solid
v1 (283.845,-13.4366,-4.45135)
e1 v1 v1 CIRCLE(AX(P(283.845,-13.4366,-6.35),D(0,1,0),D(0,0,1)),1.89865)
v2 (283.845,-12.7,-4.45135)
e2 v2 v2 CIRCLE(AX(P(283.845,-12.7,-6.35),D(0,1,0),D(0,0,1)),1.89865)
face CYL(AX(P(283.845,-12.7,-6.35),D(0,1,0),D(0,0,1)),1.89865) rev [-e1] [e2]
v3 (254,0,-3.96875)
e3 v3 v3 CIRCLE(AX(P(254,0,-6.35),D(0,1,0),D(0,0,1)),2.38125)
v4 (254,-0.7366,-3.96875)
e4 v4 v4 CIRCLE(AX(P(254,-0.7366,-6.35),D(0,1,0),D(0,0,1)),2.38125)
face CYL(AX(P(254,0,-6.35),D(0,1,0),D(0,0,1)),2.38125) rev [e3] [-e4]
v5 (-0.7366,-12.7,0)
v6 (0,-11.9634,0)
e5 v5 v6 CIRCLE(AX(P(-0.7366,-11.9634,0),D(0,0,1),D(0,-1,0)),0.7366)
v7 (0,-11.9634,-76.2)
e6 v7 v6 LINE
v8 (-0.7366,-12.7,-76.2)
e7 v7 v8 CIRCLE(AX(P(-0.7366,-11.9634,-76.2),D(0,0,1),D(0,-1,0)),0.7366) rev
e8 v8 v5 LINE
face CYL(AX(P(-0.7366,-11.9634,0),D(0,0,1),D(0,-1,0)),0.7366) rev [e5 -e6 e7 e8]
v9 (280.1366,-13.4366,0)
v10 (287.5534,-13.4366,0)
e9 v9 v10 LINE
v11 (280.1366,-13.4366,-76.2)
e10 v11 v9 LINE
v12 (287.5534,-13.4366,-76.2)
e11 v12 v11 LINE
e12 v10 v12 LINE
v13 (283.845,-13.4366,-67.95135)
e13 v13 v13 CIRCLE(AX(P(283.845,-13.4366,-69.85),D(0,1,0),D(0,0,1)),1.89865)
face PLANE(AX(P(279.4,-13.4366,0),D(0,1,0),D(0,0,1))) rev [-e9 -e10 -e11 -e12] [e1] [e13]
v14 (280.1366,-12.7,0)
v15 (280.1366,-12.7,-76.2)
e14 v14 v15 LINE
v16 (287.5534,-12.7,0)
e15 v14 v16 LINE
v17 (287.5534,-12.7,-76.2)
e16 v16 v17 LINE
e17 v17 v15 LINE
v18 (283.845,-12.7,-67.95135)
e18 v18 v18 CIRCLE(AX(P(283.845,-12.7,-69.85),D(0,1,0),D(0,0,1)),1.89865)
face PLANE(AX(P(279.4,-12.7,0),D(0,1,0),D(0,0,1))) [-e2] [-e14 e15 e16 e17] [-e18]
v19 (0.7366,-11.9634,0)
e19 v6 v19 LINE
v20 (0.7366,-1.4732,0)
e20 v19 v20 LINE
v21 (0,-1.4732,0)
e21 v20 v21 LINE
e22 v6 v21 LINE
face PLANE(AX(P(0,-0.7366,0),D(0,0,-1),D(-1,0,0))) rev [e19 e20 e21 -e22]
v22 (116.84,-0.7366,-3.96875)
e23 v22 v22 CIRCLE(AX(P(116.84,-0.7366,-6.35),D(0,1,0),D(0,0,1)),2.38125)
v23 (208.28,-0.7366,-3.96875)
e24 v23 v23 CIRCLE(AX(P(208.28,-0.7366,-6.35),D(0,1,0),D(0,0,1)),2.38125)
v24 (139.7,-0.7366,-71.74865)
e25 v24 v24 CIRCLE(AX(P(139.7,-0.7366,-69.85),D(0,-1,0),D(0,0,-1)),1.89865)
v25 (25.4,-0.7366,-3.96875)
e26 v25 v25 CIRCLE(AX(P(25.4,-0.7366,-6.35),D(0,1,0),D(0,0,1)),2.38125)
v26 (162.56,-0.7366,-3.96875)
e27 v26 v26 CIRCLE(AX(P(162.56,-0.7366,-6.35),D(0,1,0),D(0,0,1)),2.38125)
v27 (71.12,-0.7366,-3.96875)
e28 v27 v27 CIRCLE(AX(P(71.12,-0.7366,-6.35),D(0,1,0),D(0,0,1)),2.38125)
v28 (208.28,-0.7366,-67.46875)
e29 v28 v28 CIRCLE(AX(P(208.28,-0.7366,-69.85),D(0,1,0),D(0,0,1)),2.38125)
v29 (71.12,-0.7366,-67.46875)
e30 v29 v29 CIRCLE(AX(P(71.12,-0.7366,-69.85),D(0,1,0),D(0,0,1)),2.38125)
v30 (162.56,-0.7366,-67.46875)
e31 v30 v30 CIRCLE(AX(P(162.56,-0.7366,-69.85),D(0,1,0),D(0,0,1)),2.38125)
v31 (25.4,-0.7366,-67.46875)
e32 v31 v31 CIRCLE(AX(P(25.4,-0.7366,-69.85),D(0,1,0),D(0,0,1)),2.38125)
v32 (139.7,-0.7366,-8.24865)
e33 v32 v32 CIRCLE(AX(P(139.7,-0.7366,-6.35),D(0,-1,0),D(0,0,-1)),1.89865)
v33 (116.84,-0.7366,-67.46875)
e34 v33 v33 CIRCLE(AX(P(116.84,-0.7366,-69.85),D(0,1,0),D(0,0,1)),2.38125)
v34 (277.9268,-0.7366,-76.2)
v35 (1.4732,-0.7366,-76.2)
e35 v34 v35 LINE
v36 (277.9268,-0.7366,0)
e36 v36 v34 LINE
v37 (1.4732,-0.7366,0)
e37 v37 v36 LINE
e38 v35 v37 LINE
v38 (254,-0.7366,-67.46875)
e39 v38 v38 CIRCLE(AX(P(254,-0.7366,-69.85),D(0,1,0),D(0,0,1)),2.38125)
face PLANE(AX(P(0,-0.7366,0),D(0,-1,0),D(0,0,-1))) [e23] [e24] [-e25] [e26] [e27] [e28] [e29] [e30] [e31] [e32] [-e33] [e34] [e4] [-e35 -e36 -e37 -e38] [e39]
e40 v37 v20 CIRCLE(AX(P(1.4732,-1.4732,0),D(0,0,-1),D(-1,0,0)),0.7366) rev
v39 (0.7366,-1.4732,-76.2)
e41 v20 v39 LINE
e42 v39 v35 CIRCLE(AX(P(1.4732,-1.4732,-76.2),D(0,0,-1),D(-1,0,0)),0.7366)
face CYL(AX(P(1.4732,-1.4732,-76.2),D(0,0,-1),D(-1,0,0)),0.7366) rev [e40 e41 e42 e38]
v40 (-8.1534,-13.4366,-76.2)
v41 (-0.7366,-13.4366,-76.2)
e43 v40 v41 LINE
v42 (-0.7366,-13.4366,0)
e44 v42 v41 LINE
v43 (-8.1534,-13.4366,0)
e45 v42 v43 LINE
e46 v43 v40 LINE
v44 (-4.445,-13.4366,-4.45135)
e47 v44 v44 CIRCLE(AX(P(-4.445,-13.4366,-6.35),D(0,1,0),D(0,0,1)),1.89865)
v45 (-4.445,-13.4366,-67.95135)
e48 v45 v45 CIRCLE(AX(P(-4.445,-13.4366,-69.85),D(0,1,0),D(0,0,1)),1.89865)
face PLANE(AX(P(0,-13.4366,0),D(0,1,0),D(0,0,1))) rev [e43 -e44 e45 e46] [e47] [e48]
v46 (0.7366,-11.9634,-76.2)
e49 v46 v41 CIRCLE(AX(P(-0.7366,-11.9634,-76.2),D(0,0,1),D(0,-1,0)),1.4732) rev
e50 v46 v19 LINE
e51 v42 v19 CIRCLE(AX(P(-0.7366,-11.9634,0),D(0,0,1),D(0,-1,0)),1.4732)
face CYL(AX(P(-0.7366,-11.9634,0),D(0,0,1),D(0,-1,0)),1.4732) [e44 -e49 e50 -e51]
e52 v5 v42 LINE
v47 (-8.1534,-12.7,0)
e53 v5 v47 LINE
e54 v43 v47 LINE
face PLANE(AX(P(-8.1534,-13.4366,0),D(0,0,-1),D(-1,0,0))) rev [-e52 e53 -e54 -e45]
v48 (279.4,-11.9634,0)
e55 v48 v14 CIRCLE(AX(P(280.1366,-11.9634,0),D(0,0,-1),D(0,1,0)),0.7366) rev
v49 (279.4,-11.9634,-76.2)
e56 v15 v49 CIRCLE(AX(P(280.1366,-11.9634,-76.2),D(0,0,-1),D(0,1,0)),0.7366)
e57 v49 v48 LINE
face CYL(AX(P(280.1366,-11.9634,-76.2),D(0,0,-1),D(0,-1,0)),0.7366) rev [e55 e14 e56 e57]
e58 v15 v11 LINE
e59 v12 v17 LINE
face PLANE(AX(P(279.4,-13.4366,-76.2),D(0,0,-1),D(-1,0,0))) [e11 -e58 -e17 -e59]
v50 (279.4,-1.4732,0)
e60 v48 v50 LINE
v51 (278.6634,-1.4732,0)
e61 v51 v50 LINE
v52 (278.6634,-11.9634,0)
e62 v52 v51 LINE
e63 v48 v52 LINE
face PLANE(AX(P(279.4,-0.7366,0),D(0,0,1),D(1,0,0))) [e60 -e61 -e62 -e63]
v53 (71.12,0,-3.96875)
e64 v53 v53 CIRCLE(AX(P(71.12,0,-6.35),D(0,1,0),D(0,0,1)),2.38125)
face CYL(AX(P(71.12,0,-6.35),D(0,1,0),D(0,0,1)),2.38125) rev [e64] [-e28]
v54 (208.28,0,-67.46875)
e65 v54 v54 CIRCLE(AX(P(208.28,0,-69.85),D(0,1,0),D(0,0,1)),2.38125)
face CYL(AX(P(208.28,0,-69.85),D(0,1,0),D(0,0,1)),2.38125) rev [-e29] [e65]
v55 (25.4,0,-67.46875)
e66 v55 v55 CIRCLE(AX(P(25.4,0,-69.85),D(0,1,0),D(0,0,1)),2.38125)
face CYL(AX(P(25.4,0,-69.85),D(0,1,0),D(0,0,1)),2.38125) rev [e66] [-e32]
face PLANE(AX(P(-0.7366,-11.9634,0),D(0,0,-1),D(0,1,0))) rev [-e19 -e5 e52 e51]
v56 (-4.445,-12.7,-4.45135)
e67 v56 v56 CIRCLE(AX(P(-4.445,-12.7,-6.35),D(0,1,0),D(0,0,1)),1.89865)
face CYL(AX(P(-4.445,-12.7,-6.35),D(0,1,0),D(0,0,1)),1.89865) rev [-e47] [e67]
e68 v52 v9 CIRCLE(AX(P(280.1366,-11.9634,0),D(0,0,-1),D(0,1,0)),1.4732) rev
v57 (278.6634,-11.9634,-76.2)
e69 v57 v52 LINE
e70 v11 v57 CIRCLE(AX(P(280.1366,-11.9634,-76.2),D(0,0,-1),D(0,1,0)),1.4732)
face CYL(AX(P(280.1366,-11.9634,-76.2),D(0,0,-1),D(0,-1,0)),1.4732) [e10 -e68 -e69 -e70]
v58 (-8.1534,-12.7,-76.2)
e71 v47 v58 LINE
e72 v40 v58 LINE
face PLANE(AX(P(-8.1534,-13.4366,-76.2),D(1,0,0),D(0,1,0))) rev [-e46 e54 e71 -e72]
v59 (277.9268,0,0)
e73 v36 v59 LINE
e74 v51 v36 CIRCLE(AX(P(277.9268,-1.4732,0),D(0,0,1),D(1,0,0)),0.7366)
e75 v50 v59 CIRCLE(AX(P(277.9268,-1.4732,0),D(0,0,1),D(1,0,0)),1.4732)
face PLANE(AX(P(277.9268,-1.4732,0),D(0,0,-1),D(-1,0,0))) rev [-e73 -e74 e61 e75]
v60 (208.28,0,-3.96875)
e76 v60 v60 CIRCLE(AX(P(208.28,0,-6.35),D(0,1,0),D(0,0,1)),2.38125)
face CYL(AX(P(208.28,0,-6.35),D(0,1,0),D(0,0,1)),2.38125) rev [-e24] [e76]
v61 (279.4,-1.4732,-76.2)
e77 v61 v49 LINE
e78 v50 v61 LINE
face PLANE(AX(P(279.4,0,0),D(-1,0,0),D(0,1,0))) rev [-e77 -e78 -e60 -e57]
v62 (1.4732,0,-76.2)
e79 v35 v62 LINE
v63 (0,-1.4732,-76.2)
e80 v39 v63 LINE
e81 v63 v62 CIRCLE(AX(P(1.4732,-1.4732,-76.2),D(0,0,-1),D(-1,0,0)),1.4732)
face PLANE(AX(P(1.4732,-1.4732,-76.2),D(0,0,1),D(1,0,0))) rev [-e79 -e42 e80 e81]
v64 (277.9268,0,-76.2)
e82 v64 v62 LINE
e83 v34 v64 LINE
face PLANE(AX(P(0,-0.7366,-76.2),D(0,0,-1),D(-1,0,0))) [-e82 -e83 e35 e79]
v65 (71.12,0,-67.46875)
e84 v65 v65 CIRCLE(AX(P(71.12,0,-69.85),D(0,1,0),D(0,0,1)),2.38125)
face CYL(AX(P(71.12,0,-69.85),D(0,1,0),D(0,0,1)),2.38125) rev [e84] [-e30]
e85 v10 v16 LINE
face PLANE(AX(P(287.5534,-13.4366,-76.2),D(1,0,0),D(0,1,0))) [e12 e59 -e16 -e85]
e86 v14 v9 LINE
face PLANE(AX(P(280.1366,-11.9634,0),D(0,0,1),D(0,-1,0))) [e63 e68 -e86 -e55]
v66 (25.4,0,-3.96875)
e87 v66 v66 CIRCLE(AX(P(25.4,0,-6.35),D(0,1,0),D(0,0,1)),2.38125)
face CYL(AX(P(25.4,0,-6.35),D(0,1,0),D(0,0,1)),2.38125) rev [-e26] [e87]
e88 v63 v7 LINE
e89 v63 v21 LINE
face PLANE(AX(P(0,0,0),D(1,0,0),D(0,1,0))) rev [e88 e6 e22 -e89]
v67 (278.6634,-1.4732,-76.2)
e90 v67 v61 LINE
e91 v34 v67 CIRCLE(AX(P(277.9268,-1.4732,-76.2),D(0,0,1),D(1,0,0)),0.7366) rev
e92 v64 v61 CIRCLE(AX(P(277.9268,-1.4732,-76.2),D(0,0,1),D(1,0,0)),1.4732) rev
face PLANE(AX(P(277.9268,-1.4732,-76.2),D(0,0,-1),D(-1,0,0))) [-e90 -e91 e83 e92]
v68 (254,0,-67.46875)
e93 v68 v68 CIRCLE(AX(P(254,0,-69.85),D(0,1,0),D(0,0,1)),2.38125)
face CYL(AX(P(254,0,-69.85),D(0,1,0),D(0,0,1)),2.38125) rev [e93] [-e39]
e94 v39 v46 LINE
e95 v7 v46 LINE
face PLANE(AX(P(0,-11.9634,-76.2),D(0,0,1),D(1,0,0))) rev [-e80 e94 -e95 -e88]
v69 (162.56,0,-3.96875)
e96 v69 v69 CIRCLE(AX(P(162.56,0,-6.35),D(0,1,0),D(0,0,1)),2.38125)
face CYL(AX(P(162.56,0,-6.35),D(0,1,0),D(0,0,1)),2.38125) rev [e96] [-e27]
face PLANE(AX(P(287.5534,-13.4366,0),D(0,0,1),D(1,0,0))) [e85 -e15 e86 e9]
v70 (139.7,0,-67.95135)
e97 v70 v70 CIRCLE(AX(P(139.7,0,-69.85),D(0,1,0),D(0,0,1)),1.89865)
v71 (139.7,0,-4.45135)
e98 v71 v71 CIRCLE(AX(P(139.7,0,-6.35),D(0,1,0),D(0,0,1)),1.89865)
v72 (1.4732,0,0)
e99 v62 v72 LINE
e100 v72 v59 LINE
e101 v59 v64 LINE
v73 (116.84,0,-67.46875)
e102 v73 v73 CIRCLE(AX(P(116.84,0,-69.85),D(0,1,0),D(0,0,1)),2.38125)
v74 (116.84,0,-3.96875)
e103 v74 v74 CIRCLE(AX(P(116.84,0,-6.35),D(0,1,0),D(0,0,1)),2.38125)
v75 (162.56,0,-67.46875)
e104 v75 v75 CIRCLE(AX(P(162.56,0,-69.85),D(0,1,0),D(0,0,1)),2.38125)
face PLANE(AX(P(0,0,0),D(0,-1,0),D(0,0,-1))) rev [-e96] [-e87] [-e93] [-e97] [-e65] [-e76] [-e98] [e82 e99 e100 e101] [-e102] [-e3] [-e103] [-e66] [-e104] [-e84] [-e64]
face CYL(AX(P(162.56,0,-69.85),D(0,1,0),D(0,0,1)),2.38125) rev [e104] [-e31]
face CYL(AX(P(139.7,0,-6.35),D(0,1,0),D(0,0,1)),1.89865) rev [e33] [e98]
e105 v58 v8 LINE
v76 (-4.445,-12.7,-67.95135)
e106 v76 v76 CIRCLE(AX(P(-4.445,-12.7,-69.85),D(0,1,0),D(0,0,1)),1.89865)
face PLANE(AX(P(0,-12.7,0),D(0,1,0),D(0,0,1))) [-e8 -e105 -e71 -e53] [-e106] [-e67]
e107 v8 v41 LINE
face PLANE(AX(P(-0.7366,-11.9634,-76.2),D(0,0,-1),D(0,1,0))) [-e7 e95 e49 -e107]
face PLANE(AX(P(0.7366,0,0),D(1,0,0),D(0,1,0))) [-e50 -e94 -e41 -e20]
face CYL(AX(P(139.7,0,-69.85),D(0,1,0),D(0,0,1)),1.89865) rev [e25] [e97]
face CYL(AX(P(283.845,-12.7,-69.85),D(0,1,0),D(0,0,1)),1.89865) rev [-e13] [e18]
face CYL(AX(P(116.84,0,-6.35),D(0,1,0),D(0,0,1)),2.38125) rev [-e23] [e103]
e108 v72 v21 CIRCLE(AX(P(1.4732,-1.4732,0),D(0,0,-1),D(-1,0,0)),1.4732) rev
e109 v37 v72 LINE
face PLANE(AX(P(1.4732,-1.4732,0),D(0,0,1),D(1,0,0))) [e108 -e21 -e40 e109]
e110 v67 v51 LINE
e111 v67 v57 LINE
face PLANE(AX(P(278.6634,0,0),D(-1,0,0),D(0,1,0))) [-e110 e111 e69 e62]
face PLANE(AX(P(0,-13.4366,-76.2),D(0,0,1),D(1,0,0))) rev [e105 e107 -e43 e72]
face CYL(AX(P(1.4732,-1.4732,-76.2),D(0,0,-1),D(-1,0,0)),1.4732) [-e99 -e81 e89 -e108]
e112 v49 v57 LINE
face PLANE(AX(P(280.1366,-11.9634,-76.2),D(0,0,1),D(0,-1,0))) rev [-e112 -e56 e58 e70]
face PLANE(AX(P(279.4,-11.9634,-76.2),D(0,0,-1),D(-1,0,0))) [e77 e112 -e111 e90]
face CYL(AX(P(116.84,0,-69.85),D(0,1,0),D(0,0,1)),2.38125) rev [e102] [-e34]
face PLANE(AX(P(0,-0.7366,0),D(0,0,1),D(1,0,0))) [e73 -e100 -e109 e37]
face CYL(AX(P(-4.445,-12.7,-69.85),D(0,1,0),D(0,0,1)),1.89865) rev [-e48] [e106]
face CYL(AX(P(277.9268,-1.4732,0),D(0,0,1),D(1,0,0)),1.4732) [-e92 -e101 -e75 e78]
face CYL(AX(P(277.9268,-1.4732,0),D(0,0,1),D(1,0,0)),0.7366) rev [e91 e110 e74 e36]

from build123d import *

# Parameters (mm, degrees)
SKETCH1_W                    = 279.4
SKETCH1_H                    = 76.2
BASE_FLANGE1_DEPTH           = 0.7366
EDGE_FLANGE1_STRIP_W         = 4.4196
EDGE_FLANGE1_STRIP_H         = 0.7366
EDGE_FLANGE1_STRIP_CUT_DEPTH = 76.2
EDGE_FLANGE1_DEPTH           = 76.2
EDGE_FLANGE2_DEPTH           = 76.2
F_6_CLEARANCE_HOLE1_D        = 3.7973
LPATTERN1_COUNT              = 6
LPATTERN1_PITCH              = 45.72
LPATTERN1_COUNT_DIR2         = 2
LPATTERN1_PITCH_DIR2         = 63.5
F_6_CLEARANCE_HOLE2_D        = 3.7973


# Sheet-metal steps are written as plain solids
with BuildPart() as part:
    # Sketch1 → Base-Flange1 (new body)
    with BuildSketch(Plane(origin=(0, 0, 0), x_dir=(1, 0, 0), z_dir=(0, 1, 0))):
        with Locations((139.7, 38.1)):
            Rectangle(SKETCH1_W, SKETCH1_H)
    extrude(amount=-BASE_FLANGE1_DEPTH)

    # Edge-Flange1 strip (across the edge) → Edge-Flange1 strip cut (cut)
    with BuildSketch(Plane(origin=(0, -0.7366, 0), x_dir=(1, 0, 0), z_dir=(0, 0, -1))):
        with Locations((-0.7366, -0.3683)):
            Rectangle(EDGE_FLANGE1_STRIP_W, EDGE_FLANGE1_STRIP_H)
    edge_flange1_strip_cut = extrude(amount=EDGE_FLANGE1_STRIP_CUT_DEPTH, mode=Mode.SUBTRACT)

    # Edge-Flange1 section (across the edge) → Edge-Flange1 (add)
    with BuildSketch(Plane(origin=(0, -0.7366, 0), x_dir=(1, 0, 0), z_dir=(0, 0, -1))):
        with BuildLine():
            Line((0, 0.7366), (0, 11.2268))
            Line((0, 11.2268), (0.7366, 11.2268))
            Line((0.7366, 11.2268), (0.7366, 0.7366))
            ThreePointArc((0.7366, 0.7366), (0.952345145, 0.215745145), (1.4732, 0))
            Line((1.4732, 0), (1.4732, -0.7366))
            ThreePointArc((1.4732, -0.7366), (0.43149029, -0.30510971), (0, 0.7366))
        make_face()
    edge_flange1 = extrude(amount=EDGE_FLANGE1_DEPTH)

    # Edge-Flange2 section (across the edge) → Edge-Flange2 (add)
    with BuildSketch(Plane(origin=(0, -12.7, -76.2), x_dir=(0, 1, 0), z_dir=(0, 0, 1))):
        with BuildLine():
            Line((-0.7366, 0.7366), (-0.7366, 8.1534))
            Line((-0.7366, 8.1534), (0, 8.1534))
            Line((0, 8.1534), (0, 0.7366))
            ThreePointArc((0, 0.7366), (0.215745145, 0.215745145), (0.7366, 0))
            Line((0.7366, 0), (0.7366, -0.7366))
            ThreePointArc((0.7366, -0.7366), (-0.30510971, -0.30510971), (-0.7366, 0.7366))
        make_face()
    edge_flange2 = extrude(amount=EDGE_FLANGE2_DEPTH)

    # Sketch21 → 3/32 (0.09375) Diameter Hole1 (revolve, cut)
    with BuildSketch(Plane(origin=(25.4, 0, -69.85), x_dir=(0, 0, 1), z_dir=(1, 0, 0))):
        Polygon((0, 0), (0, 2.167399349), (2.38125, 0.7366), (2.38125, 0), align=None)
    f_3_32_0_09375_diameter_hole1 = revolve(axis=Axis((25.4, 6.35, -69.85), (0, -1, 0)), mode=Mode.SUBTRACT)

    # #6 Clearance Hole1 (through all)
    with Locations(Plane(origin=(0, -12.7, 0), x_dir=(1, 0, 0), z_dir=(0, 1, 0))):
        with Locations((-4.445, 69.85), (-4.445, 6.35)):
            f_6_clearance_hole1 = Hole(F_6_CLEARANCE_HOLE1_D / 2)

    # LPattern1: 3_32 _0.09375_ Diameter Hole1 6 × 2
    with Locations(*[(i * LPATTERN1_PITCH, 0, j * LPATTERN1_PITCH_DIR2) for i in range(LPATTERN1_COUNT) for j in range(LPATTERN1_COUNT_DIR2) if (i, j) != (0, 0)]):
        add(f_3_32_0_09375_diameter_hole1, mode=Mode.SUBTRACT)

    # Mirror2: Edge-Flange1 strip cut, Edge-Flange1, Edge-Flange2, #6 Clearance Hole1 across plane
    add(edge_flange1_strip_cut.mirror(Plane.ZY.offset(-139.7)), mode=Mode.SUBTRACT)
    add(edge_flange1.mirror(Plane.ZY.offset(-139.7)))
    add(edge_flange2.mirror(Plane.ZY.offset(-139.7)))
    add(f_6_clearance_hole1.mirror(Plane.ZY.offset(-139.7)), mode=Mode.SUBTRACT)

    # #6 Clearance Hole2 (through all)
    with Locations(Plane(origin=(0, 0, 0), x_dir=(1, 0, 0), z_dir=(0, 1, 0))):
        with Locations((139.7, 69.85), (139.7, 6.35)):
            Hole(F_6_CLEARANCE_HOLE2_D / 2)


solid = part.part
